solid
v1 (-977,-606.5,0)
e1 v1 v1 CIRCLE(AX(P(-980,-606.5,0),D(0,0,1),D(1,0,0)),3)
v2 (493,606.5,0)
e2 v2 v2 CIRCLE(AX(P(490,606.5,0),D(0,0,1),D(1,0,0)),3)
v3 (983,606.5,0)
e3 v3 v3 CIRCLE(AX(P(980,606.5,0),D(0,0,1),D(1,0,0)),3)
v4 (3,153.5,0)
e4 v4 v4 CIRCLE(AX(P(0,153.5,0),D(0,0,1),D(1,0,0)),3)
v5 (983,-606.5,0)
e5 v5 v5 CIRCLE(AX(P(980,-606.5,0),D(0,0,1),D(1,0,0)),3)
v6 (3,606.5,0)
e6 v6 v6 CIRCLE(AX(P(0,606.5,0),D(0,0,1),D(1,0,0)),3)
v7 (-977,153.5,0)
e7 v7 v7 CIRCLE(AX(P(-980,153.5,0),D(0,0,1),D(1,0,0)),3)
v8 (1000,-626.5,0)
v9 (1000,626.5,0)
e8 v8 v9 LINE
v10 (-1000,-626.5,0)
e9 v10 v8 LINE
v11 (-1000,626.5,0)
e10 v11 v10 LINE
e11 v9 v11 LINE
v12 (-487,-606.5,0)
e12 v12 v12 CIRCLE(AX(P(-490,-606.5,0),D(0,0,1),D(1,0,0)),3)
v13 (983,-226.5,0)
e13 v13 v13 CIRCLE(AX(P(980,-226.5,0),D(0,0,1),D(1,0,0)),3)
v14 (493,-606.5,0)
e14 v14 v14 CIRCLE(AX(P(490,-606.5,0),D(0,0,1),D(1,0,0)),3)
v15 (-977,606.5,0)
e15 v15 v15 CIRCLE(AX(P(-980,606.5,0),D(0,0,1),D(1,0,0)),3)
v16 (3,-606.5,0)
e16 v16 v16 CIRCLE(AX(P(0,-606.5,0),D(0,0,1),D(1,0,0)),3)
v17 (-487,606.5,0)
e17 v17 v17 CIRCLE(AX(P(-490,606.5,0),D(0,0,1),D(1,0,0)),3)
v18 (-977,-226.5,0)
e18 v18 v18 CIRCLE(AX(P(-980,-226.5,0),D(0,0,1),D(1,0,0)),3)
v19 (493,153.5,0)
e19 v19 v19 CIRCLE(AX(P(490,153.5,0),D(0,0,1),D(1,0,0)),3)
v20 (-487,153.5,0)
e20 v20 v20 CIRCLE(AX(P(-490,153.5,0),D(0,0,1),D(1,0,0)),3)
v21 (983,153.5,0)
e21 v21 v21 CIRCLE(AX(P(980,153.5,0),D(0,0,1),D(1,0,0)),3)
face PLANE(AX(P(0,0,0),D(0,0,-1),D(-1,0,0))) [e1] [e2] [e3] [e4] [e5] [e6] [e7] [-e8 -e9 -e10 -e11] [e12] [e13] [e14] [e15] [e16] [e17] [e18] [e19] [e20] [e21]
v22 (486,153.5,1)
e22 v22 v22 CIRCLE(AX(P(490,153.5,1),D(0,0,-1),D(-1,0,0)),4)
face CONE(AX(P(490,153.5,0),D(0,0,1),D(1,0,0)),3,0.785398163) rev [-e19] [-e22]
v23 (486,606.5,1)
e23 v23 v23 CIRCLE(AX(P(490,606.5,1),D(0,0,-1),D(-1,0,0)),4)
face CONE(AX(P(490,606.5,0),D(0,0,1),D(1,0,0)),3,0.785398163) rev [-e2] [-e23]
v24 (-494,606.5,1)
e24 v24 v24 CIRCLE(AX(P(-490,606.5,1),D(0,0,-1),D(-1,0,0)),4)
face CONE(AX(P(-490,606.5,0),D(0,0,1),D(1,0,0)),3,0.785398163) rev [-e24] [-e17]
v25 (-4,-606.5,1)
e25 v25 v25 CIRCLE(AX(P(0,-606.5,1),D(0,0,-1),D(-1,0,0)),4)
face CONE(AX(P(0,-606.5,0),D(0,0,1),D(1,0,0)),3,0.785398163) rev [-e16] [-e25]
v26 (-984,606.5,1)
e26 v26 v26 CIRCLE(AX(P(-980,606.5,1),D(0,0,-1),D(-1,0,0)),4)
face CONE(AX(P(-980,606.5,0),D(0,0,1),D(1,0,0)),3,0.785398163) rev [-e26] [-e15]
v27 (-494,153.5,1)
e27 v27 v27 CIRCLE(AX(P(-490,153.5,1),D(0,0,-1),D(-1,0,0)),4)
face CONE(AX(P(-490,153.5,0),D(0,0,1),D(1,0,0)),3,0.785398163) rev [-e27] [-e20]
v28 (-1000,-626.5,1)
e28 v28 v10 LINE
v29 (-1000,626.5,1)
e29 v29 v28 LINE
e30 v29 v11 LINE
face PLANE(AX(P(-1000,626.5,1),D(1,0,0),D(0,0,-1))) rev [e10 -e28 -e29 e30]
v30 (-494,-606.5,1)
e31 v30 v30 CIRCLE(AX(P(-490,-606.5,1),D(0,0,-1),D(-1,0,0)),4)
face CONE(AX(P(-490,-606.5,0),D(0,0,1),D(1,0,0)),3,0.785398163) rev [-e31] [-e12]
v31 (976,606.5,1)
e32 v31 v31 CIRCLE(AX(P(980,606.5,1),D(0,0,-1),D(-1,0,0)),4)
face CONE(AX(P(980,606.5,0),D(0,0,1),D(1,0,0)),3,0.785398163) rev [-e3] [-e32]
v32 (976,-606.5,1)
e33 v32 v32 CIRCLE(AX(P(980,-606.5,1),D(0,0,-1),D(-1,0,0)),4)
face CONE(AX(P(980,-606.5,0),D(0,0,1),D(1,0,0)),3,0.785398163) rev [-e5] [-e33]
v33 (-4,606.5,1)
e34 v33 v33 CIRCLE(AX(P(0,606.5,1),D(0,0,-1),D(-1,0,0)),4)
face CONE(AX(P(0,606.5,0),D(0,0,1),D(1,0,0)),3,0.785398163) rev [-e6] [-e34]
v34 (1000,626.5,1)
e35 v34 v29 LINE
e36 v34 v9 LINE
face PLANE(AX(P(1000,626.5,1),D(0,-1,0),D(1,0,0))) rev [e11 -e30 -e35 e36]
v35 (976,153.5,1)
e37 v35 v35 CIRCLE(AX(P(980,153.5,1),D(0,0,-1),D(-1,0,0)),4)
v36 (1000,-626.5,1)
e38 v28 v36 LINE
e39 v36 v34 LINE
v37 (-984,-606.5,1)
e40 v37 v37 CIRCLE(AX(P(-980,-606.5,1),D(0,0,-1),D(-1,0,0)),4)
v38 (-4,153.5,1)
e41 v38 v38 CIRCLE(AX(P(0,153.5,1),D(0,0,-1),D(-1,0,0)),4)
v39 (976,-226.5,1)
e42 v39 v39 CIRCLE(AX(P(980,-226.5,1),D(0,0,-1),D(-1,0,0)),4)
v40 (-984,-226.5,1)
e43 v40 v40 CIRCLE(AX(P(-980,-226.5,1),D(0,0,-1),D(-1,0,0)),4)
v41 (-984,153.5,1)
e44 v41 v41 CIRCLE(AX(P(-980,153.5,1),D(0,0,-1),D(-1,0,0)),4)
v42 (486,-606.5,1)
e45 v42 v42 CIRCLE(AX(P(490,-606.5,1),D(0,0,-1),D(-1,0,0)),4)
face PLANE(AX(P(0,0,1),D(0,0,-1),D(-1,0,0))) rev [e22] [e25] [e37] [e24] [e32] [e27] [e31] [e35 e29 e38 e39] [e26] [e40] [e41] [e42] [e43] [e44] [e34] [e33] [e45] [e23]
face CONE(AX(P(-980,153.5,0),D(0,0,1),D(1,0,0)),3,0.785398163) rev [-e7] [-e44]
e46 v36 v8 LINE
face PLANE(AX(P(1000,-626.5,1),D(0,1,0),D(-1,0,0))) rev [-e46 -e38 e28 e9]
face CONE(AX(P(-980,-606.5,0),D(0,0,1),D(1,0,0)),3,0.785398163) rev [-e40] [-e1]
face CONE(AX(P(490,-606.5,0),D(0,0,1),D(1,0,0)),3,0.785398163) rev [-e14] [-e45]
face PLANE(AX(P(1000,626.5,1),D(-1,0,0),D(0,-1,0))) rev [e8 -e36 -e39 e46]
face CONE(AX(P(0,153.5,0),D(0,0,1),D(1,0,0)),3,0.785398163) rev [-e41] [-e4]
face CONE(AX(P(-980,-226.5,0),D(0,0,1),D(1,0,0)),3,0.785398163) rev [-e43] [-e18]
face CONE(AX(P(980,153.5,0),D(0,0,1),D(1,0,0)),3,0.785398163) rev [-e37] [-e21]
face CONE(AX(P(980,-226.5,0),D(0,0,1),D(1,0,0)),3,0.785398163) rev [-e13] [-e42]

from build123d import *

# Parameters (mm, degrees)
SKETCH1_W           = 2000
SKETCH1_H           = 1253
SKETCH1_R           = 3
BOSS_EXTRUDE1_DEPTH = 1
CHAMFER1_SIZE       = 1


with BuildPart() as part:
    # Sketch1 → Boss-Extrude1 (new body)
    with BuildSketch(Plane.XY):
        Rectangle(SKETCH1_W, SKETCH1_H)
        with Locations((-980, 606.5)):
            Circle(SKETCH1_R, mode=Mode.SUBTRACT)
        with Locations((980, 606.5)):
            Circle(SKETCH1_R, mode=Mode.SUBTRACT)
        with Locations((0, 606.5)):
            Circle(SKETCH1_R, mode=Mode.SUBTRACT)
        with Locations((-980, -606.5)):
            Circle(SKETCH1_R, mode=Mode.SUBTRACT)
        with Locations((980, -606.5)):
            Circle(SKETCH1_R, mode=Mode.SUBTRACT)
        with Locations((0, -606.5)):
            Circle(SKETCH1_R, mode=Mode.SUBTRACT)
        with Locations((-490, -606.5)):
            Circle(SKETCH1_R, mode=Mode.SUBTRACT)
        with Locations((490, -606.5)):
            Circle(SKETCH1_R, mode=Mode.SUBTRACT)
        with Locations((-490, 606.5)):
            Circle(SKETCH1_R, mode=Mode.SUBTRACT)
        with Locations((490, 606.5)):
            Circle(SKETCH1_R, mode=Mode.SUBTRACT)
        with Locations((980, 153.5)):
            Circle(SKETCH1_R, mode=Mode.SUBTRACT)
        with Locations((490, 153.5)):
            Circle(SKETCH1_R, mode=Mode.SUBTRACT)
        with Locations((0, 153.5)):
            Circle(SKETCH1_R, mode=Mode.SUBTRACT)
        with Locations((-490, 153.5)):
            Circle(SKETCH1_R, mode=Mode.SUBTRACT)
        with Locations((-980, 153.5)):
            Circle(SKETCH1_R, mode=Mode.SUBTRACT)
        with Locations((980, -226.5)):
            Circle(SKETCH1_R, mode=Mode.SUBTRACT)
        with Locations((-980, -226.5)):
            Circle(SKETCH1_R, mode=Mode.SUBTRACT)
    extrude(amount=BOSS_EXTRUDE1_DEPTH)

    # Chamfer1
    chamfer1_edges = [part.edges().sort_by_distance(p)[0] for p in [
        (-983, 606.5, 1),
        (977, 606.5, 1),
        (-3, 606.5, 1),
        (-983, -606.5, 1),
        (977, -606.5, 1),
        (-3, -606.5, 1),
        (977, -226.5, 1),
        (-983, -226.5, 1),
        (-493, -606.5, 1),
        (487, -606.5, 1),
        (-493, 606.5, 1),
        (487, 606.5, 1),
        (-983, 153.5, 1),
        (977, 153.5, 1),
        (-3, 153.5, 1),
        (-493, 153.5, 1),
        (487, 153.5, 1),
    ]]
    chamfer(chamfer1_edges, length=CHAMFER1_SIZE - 0.0001)  # a hair under: the kernel refuses the full size


solid = part.part
